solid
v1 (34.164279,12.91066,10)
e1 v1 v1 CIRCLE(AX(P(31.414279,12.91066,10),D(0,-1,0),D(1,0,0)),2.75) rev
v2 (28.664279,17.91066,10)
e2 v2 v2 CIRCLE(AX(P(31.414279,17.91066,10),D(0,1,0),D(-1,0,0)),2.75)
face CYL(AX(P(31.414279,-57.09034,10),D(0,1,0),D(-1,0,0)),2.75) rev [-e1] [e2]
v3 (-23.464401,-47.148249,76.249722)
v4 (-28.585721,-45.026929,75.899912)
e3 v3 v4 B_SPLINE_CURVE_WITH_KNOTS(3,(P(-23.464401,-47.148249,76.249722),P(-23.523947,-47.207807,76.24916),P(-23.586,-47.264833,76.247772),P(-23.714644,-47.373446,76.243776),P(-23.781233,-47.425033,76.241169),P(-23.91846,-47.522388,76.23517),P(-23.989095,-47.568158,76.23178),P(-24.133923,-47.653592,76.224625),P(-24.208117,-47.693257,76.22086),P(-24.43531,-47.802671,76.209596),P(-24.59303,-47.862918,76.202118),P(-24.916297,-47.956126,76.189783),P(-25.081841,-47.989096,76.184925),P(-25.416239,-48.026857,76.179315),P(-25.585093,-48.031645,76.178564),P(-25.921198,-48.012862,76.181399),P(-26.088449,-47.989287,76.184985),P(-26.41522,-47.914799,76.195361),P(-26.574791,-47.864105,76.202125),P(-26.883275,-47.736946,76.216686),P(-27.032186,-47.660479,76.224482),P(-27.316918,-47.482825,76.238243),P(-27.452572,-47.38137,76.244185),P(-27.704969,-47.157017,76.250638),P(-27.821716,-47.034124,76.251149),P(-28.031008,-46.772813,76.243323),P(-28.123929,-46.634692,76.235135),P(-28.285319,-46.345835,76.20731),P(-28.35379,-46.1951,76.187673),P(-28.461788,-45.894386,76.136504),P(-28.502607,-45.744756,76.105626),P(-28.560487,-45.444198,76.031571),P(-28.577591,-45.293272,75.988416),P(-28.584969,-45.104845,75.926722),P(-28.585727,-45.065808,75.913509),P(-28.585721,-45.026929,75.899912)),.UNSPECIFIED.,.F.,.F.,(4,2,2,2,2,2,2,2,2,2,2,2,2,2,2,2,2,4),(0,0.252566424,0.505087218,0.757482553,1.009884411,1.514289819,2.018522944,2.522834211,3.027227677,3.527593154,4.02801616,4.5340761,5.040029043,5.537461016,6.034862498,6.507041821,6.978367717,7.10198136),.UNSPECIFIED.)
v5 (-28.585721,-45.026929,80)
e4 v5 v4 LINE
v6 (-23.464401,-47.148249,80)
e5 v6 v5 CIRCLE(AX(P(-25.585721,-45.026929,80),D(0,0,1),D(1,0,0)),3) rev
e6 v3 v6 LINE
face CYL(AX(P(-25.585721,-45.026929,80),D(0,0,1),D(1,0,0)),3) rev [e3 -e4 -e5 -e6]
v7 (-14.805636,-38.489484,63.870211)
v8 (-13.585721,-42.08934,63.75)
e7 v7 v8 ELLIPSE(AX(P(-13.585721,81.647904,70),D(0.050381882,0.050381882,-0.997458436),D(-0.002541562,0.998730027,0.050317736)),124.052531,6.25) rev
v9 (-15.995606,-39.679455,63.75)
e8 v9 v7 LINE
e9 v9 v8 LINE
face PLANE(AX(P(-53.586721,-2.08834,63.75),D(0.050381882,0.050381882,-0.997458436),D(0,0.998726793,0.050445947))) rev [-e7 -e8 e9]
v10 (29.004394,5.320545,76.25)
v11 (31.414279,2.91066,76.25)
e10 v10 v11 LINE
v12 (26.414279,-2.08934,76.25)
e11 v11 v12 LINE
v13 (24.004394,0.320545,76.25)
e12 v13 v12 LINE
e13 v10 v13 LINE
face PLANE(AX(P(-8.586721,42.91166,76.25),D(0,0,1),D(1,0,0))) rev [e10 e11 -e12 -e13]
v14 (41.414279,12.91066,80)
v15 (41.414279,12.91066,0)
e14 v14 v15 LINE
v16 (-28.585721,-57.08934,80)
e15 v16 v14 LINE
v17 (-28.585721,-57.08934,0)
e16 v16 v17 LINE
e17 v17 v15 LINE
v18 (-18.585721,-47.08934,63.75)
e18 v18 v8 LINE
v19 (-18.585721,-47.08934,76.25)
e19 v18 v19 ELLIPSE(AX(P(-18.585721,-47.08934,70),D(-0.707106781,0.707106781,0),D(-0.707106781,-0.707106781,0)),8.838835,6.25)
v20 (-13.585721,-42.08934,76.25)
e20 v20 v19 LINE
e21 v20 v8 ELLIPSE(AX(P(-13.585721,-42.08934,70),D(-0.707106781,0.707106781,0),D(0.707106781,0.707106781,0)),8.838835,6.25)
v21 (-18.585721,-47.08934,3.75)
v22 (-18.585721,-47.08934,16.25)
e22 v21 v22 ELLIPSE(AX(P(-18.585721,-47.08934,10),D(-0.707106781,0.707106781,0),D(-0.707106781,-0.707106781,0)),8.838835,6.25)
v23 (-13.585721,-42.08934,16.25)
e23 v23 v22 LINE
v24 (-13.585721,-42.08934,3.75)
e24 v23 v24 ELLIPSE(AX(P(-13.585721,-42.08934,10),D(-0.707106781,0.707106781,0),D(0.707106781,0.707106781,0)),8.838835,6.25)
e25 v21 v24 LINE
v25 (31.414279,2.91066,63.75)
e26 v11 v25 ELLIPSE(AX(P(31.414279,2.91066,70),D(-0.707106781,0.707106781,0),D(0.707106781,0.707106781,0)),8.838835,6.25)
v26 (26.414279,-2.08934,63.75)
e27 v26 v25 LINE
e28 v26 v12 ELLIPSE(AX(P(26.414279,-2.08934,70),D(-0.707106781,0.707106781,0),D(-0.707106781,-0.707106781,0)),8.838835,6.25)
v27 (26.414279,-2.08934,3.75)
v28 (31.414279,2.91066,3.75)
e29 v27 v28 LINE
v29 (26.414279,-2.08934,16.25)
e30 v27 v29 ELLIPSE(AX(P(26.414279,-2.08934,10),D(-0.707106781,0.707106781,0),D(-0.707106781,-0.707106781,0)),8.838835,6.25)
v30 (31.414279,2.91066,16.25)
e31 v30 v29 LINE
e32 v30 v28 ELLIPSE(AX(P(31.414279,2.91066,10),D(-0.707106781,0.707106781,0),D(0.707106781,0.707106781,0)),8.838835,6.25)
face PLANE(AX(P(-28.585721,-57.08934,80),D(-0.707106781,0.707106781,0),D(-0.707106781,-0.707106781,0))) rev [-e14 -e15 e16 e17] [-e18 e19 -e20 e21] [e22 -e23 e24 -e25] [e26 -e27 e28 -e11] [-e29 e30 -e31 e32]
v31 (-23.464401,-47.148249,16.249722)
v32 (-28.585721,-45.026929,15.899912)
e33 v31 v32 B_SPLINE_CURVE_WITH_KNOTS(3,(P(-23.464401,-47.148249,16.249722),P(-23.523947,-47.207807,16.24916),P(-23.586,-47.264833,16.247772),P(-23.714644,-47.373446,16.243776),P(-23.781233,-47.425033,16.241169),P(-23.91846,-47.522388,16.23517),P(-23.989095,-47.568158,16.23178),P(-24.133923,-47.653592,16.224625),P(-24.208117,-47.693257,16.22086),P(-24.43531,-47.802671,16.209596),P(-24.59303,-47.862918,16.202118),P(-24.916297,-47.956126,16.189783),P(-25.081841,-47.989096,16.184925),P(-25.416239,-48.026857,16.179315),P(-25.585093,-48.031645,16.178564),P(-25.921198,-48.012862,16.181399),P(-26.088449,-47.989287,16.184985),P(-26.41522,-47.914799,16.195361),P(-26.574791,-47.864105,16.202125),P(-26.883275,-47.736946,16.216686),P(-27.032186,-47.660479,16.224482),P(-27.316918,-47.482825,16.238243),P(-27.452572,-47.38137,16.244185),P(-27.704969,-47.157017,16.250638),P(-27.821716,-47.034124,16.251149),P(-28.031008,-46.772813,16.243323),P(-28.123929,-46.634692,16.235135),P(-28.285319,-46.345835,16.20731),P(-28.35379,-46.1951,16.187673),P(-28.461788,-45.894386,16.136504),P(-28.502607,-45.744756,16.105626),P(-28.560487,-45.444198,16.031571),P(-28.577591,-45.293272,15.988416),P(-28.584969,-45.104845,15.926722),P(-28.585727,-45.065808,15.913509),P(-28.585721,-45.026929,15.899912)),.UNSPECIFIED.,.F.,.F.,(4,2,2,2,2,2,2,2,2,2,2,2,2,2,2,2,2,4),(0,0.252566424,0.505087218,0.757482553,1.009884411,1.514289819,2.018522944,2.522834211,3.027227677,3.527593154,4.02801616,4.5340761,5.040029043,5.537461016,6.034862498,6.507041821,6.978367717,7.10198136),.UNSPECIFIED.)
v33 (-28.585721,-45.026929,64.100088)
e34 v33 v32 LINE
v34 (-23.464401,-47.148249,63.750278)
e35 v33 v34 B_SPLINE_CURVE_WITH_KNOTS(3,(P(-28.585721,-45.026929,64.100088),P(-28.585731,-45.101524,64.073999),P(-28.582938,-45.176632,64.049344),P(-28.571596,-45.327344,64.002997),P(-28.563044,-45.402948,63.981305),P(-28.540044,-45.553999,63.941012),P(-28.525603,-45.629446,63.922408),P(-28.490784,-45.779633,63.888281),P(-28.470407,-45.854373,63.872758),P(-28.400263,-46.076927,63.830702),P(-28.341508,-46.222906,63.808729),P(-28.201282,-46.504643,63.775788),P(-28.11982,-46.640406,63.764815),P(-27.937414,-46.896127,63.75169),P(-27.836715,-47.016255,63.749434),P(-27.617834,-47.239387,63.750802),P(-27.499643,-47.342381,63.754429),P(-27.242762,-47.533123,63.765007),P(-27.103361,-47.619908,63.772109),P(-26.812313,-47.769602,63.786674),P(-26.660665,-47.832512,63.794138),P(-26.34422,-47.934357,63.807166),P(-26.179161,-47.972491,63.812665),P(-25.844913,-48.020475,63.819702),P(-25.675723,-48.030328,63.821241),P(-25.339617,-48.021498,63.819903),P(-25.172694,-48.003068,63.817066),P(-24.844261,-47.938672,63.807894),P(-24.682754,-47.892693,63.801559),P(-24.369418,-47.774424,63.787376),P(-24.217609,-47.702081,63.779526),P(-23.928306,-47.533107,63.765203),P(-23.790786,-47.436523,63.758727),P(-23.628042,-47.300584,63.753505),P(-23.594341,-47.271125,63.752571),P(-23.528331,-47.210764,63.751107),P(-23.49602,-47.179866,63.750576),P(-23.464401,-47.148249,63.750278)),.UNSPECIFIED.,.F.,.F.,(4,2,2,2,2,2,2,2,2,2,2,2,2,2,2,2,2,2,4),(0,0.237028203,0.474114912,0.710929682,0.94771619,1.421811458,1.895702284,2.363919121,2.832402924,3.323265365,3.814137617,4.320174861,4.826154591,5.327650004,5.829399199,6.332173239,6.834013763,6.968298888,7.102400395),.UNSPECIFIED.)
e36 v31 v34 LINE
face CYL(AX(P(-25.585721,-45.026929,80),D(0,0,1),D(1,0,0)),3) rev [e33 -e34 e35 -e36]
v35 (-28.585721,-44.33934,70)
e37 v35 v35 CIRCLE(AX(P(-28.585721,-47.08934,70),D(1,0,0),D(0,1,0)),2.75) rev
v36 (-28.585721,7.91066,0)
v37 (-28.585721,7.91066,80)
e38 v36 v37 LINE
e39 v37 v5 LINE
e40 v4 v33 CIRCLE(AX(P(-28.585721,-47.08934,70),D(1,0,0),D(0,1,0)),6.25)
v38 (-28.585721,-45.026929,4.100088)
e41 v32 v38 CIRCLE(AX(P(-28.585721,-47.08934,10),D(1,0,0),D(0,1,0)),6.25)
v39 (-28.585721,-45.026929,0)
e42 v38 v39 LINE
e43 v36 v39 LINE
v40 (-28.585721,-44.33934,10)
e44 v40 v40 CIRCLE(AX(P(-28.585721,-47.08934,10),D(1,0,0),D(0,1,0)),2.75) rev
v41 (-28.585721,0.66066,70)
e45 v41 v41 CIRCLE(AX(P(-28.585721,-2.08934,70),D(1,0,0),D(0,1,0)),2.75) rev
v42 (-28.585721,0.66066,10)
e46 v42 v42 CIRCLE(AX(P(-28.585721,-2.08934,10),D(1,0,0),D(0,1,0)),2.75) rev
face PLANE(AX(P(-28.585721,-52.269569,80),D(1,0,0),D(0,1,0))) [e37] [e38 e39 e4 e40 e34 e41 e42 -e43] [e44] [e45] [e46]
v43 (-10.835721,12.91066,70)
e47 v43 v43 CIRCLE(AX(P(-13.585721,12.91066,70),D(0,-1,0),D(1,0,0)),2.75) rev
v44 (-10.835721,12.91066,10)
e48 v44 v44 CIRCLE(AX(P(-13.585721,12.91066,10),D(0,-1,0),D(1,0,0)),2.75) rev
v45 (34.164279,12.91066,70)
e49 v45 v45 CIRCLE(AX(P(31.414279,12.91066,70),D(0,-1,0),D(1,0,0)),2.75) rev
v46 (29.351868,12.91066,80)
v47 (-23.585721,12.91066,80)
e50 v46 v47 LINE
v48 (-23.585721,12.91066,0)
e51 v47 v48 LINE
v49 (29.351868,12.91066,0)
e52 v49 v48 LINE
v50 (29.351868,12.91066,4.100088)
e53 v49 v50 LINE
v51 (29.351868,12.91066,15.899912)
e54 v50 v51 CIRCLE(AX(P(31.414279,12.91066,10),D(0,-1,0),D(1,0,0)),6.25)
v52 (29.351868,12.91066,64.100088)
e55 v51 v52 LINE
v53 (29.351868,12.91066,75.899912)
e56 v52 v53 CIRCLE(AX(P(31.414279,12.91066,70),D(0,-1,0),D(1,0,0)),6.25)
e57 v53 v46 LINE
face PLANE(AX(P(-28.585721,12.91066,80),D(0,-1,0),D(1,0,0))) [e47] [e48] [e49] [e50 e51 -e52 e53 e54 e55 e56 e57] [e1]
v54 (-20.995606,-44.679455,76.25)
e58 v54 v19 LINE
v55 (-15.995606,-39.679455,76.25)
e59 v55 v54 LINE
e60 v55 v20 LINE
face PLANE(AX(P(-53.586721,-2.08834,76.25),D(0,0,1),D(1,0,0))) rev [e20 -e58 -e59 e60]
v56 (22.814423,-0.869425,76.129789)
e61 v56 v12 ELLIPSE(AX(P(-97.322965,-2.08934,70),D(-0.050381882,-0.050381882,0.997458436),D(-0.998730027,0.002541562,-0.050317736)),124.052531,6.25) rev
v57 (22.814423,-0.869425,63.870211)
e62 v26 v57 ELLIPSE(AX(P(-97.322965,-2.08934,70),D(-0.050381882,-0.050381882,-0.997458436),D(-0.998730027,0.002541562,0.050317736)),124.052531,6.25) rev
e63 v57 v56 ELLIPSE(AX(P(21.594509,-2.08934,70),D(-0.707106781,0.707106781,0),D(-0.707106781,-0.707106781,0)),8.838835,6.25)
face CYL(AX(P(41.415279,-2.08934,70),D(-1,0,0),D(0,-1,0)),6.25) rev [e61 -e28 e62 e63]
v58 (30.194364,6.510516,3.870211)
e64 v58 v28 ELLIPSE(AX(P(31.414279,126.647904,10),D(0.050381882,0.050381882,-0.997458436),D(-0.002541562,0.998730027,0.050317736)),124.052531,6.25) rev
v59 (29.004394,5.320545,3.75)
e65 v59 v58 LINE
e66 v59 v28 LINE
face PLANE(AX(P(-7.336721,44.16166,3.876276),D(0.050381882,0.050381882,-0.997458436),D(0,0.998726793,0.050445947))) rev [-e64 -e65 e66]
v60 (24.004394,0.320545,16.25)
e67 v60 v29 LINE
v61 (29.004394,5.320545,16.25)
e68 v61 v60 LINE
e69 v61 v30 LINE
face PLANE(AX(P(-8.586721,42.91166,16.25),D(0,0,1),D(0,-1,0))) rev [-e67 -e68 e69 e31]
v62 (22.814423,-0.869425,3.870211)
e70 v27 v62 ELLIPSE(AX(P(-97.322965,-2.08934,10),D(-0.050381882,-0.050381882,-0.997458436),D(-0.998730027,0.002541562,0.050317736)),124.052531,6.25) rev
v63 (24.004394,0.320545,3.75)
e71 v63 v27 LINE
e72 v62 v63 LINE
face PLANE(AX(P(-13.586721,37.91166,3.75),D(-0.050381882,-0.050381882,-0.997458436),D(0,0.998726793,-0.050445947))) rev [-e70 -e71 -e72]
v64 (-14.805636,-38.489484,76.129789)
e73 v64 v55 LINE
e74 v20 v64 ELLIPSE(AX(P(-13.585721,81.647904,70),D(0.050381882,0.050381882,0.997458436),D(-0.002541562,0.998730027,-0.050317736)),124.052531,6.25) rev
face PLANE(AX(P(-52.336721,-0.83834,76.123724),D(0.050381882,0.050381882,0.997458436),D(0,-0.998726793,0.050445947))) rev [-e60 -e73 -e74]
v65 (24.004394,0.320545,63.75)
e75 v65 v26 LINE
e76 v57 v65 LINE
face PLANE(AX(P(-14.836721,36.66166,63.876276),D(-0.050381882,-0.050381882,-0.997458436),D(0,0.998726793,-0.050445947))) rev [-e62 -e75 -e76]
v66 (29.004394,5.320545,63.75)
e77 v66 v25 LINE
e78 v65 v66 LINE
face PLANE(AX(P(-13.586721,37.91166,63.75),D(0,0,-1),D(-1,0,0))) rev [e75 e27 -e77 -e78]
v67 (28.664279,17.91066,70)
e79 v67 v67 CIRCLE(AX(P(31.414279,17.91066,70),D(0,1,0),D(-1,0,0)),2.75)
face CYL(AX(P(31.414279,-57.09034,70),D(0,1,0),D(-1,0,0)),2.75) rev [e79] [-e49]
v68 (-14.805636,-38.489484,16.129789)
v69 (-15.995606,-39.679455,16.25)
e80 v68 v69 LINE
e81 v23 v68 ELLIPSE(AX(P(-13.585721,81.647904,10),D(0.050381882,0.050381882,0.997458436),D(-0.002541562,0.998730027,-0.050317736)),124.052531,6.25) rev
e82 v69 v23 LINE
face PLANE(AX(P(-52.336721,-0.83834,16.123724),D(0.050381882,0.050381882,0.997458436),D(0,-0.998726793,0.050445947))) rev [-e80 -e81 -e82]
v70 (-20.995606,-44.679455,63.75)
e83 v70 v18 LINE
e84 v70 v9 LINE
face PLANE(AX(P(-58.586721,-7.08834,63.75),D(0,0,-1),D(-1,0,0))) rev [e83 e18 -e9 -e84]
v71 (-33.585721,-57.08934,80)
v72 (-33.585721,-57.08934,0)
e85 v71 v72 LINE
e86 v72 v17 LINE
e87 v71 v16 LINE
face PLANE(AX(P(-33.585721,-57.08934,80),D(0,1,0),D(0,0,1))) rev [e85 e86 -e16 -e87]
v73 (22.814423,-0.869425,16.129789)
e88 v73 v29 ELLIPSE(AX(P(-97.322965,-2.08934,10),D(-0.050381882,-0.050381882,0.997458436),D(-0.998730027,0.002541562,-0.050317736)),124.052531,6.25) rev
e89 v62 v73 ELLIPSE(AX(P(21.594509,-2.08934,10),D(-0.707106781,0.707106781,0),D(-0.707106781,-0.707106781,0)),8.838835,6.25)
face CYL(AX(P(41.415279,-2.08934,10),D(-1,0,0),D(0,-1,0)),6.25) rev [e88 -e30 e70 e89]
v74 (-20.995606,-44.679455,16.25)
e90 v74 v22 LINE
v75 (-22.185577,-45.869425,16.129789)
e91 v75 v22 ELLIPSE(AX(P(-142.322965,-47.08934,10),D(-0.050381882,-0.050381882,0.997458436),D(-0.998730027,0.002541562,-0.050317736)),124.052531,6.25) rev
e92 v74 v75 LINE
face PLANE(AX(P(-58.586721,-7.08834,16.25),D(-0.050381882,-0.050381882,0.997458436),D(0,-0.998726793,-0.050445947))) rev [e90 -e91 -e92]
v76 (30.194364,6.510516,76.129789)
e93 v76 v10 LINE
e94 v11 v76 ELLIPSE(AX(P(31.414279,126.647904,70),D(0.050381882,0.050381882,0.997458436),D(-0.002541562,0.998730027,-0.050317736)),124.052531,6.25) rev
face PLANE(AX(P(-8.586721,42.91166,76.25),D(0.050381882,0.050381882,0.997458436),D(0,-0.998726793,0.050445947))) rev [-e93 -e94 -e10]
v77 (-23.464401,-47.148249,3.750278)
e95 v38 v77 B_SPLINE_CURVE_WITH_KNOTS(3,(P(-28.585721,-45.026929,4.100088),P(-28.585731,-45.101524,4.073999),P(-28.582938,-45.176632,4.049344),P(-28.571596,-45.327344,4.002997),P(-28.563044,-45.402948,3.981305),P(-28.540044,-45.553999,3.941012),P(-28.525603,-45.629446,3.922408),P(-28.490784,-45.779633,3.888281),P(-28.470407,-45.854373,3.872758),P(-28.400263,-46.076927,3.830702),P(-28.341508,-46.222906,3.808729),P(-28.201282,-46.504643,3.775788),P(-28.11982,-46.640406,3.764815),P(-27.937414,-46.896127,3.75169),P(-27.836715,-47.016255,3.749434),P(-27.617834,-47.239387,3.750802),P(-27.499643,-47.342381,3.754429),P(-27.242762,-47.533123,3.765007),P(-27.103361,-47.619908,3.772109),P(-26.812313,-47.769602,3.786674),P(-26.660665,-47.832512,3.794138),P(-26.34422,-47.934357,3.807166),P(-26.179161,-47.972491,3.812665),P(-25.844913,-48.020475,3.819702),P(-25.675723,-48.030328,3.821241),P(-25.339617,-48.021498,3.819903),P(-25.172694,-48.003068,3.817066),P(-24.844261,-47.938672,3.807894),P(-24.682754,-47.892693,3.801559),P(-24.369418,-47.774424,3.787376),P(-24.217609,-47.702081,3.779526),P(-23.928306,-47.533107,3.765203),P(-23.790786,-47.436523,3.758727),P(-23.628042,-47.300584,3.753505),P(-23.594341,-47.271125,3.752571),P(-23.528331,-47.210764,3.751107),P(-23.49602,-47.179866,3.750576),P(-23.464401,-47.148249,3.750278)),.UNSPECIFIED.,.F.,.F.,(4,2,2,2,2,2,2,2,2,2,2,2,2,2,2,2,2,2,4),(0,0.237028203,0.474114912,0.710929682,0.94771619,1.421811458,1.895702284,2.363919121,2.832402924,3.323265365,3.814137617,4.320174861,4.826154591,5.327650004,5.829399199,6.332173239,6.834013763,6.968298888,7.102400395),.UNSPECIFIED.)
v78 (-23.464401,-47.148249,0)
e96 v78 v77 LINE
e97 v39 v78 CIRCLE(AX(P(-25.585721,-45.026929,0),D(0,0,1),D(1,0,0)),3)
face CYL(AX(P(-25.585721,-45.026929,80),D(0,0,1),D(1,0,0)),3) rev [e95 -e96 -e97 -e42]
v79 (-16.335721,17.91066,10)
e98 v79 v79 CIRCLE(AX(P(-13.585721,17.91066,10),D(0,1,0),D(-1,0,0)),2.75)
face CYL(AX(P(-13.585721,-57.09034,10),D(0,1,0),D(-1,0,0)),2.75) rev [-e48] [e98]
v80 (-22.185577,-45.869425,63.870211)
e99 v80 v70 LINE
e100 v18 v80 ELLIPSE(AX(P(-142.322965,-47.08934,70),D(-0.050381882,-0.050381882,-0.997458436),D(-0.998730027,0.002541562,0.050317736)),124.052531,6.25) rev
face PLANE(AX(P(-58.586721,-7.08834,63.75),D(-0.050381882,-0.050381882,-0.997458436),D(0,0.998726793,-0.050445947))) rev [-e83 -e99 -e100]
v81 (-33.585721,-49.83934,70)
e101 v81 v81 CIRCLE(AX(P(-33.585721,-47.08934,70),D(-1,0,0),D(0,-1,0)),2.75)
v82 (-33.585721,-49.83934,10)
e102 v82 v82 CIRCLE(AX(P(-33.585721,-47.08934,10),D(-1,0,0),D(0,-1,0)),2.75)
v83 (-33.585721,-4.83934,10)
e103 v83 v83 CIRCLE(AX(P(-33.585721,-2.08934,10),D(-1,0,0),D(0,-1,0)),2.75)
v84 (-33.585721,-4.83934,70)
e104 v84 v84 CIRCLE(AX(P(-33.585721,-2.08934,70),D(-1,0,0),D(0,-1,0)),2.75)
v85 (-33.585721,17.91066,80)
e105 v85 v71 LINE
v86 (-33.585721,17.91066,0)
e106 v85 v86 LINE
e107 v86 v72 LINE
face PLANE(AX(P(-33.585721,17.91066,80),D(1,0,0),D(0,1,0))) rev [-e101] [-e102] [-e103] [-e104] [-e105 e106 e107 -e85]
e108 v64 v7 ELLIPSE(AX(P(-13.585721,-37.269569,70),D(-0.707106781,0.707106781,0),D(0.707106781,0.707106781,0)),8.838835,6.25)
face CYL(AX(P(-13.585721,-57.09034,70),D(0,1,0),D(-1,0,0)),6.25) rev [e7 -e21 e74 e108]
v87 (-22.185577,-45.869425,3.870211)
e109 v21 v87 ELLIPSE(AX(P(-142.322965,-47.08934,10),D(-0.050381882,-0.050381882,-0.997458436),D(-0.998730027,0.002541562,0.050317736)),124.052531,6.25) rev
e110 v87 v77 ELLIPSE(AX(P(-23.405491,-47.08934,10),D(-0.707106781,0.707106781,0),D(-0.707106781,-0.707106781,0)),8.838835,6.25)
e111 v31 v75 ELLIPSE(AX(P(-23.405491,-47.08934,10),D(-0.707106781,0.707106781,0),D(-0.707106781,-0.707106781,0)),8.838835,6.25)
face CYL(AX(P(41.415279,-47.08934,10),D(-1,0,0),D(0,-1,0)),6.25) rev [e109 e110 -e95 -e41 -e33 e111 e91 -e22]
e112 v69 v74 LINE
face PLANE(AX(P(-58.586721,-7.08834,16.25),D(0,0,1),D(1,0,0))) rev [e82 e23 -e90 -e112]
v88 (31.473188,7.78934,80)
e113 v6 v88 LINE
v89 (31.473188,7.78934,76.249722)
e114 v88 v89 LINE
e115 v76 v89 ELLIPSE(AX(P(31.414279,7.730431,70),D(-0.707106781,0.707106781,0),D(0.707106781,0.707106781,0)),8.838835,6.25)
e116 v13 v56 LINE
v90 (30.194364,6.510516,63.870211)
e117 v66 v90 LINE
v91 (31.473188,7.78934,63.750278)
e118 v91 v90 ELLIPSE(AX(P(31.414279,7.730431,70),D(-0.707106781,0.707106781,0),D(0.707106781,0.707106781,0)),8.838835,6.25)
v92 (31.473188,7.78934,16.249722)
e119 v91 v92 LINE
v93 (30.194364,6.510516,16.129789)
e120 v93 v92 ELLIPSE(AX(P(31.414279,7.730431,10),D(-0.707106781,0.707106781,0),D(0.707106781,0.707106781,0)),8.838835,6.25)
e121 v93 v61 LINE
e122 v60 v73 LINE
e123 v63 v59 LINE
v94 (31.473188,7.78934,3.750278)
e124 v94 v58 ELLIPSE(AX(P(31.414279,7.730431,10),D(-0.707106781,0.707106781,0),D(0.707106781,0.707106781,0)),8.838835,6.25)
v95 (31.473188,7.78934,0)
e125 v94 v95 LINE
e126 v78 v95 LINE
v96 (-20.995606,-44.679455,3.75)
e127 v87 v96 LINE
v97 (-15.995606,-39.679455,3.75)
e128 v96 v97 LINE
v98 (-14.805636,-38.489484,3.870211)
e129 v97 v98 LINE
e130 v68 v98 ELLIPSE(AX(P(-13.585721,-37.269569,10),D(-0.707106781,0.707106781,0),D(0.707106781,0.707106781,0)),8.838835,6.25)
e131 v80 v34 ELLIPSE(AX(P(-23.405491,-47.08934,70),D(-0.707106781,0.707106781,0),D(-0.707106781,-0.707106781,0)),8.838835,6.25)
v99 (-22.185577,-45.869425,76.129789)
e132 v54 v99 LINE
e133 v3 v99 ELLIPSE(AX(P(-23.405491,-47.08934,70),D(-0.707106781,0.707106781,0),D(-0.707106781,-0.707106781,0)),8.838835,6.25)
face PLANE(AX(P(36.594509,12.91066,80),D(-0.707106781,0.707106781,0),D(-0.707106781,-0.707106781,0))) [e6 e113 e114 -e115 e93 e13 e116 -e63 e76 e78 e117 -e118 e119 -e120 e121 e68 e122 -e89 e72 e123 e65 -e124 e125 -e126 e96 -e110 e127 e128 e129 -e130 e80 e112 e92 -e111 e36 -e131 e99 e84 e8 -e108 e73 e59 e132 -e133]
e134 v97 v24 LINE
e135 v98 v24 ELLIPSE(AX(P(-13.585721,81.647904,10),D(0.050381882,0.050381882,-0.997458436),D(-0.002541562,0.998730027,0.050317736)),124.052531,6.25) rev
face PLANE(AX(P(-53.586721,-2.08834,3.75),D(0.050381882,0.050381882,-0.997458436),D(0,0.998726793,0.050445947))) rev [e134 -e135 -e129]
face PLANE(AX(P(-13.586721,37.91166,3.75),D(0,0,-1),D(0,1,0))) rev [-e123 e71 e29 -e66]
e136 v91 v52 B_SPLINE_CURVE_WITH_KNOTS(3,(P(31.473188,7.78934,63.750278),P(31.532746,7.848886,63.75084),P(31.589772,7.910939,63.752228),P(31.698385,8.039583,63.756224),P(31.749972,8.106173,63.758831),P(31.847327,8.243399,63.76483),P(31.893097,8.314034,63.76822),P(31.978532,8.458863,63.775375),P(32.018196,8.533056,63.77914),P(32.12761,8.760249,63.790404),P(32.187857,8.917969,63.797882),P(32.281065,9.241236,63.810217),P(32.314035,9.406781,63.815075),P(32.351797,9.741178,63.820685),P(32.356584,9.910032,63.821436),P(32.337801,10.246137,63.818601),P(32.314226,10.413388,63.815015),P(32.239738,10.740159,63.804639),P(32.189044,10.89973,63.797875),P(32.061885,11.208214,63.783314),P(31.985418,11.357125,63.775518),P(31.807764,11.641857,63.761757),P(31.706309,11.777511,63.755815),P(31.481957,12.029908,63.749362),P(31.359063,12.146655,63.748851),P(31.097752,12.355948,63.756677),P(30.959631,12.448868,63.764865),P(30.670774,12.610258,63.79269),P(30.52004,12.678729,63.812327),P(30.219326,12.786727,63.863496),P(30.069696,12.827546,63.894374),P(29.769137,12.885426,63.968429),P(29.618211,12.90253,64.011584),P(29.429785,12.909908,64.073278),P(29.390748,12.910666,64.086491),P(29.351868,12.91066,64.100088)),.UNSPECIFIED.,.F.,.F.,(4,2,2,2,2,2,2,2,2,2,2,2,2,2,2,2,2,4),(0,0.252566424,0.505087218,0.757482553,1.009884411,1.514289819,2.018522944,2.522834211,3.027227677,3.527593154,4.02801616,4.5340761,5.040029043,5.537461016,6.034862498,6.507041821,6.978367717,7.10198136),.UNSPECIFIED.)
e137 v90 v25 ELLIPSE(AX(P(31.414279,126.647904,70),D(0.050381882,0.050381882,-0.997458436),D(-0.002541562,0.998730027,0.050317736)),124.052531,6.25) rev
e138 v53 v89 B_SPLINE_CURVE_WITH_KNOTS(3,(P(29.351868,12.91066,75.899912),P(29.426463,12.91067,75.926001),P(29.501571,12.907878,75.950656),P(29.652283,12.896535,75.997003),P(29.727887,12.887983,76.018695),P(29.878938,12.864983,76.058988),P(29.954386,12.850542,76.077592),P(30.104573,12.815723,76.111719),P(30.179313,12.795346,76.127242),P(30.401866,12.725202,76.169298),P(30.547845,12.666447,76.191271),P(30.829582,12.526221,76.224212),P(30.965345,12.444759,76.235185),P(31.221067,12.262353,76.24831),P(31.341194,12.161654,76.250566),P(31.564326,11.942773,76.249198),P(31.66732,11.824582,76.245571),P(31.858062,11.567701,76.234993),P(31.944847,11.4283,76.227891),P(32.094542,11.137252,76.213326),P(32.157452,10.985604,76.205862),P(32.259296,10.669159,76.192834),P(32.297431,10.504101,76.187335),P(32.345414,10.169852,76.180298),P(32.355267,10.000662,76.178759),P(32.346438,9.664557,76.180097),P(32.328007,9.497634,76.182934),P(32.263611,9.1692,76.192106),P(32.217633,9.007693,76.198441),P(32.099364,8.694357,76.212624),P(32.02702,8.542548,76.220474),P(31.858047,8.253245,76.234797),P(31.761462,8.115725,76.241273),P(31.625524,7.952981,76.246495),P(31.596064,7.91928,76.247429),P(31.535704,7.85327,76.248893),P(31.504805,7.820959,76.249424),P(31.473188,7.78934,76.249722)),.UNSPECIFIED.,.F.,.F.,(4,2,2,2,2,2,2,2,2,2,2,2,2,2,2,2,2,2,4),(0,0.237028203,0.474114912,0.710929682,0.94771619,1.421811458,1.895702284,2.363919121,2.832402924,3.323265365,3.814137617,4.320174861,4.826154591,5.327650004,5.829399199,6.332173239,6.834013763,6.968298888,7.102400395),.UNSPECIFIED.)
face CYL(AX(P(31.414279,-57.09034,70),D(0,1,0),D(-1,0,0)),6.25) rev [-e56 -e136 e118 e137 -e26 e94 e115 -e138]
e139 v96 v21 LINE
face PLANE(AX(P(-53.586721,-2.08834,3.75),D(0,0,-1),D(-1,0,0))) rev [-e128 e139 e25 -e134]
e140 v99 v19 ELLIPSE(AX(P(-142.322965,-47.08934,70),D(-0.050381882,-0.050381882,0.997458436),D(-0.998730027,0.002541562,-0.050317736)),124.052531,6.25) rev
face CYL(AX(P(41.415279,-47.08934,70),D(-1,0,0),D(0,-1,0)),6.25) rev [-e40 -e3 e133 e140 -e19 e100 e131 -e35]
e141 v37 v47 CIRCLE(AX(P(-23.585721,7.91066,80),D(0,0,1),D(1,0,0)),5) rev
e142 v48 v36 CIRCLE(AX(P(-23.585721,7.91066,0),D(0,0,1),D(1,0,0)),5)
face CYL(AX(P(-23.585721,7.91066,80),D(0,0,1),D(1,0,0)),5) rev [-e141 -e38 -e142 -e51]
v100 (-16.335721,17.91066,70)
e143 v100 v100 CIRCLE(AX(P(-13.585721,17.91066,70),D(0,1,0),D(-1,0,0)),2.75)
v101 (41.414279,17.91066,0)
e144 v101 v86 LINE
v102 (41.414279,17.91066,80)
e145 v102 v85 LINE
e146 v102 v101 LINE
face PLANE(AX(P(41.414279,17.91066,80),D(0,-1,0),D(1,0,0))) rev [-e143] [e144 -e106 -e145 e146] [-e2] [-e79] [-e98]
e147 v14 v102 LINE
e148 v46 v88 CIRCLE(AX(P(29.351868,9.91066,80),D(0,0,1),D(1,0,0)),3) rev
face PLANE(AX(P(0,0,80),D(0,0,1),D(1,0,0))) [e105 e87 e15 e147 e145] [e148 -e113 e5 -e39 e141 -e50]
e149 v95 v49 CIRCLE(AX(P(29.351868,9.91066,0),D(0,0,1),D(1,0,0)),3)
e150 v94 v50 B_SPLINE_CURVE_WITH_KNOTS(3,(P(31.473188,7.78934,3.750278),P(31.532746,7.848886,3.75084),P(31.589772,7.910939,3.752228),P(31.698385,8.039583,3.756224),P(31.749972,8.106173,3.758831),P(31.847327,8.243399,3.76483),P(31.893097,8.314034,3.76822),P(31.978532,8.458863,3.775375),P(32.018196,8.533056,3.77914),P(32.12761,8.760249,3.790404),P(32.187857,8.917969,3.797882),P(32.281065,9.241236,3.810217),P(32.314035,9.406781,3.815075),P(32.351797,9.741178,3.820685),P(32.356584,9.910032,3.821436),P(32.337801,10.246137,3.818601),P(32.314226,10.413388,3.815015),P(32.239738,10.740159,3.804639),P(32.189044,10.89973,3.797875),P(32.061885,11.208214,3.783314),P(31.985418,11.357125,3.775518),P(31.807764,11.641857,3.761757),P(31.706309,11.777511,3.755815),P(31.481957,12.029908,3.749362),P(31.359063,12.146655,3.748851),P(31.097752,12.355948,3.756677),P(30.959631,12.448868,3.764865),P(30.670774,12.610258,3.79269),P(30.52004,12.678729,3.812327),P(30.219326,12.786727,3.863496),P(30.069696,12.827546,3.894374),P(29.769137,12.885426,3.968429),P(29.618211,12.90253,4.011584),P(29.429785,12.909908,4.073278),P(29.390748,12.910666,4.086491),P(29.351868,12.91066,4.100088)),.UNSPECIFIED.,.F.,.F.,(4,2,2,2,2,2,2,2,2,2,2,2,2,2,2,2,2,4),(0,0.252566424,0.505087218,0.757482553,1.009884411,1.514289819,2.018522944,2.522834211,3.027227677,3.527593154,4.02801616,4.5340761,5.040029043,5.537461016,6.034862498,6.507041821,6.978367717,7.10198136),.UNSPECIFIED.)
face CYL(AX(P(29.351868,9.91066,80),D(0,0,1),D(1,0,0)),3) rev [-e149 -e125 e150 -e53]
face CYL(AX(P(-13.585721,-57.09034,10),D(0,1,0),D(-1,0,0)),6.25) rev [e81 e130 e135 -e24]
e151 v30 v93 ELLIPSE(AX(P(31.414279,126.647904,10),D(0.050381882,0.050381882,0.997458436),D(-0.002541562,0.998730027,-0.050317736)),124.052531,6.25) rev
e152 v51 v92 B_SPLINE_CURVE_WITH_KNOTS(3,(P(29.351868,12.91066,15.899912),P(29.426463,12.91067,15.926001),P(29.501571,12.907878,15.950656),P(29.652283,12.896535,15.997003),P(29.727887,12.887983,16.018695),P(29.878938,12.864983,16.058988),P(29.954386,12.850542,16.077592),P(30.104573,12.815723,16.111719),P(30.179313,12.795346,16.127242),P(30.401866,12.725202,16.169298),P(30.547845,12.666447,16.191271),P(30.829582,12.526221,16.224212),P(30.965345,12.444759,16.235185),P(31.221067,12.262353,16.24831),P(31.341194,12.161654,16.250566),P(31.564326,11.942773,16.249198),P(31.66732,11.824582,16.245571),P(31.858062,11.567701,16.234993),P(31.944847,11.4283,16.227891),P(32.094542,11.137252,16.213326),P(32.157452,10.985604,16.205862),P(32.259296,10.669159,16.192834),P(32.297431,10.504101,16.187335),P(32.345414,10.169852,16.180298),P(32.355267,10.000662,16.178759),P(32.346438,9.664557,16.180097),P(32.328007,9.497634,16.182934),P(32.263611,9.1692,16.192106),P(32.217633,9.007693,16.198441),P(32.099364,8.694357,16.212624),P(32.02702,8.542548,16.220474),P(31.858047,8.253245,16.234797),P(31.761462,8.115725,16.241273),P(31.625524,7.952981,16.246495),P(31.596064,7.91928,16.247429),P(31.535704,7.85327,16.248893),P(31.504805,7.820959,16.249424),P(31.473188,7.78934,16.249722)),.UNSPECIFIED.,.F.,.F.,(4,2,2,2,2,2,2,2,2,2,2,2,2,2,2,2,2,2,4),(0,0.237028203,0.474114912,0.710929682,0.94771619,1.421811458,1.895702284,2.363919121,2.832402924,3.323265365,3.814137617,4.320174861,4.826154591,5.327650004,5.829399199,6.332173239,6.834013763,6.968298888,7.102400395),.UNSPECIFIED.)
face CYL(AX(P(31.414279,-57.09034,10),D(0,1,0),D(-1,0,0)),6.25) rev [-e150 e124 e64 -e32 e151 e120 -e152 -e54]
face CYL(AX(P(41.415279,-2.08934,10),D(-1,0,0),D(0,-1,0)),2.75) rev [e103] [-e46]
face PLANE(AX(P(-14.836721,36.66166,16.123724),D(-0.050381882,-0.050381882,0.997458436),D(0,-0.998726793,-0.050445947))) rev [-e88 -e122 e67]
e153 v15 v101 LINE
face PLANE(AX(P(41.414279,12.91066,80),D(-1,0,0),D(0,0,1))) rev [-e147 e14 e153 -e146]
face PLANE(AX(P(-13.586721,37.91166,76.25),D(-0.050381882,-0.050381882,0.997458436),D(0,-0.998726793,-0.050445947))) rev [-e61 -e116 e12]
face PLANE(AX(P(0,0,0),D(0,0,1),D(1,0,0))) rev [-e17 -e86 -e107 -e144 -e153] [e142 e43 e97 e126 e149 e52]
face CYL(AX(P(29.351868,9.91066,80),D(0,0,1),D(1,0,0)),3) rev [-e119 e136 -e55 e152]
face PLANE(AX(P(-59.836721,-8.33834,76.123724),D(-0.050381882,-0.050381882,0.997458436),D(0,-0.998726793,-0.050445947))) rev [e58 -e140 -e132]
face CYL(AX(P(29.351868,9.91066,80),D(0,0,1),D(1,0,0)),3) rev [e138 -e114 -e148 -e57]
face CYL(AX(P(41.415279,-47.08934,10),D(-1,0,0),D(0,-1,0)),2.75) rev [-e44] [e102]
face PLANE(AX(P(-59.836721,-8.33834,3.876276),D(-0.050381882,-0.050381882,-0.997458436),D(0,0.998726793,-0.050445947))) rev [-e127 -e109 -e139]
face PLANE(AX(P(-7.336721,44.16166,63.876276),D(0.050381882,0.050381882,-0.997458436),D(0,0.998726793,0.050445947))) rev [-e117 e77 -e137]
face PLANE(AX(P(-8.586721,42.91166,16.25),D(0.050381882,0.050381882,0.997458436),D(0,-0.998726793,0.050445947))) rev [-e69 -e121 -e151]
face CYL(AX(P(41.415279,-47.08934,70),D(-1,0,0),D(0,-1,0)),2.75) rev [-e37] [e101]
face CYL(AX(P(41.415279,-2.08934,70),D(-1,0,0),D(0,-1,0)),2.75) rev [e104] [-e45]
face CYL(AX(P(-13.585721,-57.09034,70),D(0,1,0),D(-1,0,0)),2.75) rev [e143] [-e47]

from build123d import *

# Parameters (mm, degrees)
BOSS_EXTRU_1_DEPTH      = 80
CONG_1_R                = 3
CONG_2_R                = 5
ENL_V_MAT_EXTRU_1_REACH = 119.218
ESQUISSE2_R             = 2.75
ENL_V_MAT_EXTRU_2_REACH = 116.084
ESQUISSE3_R             = 6.25
ENL_V_MAT_EXTRU_3_REACH = 125.629
ESQUISSE4_R             = 2.75
ENL_V_MAT_EXTRU_4_REACH = 122.661
ESQUISSE5_R             = 6.25
ENL_V_START             = -3.408092413
ENL_V_MAT_EXTRU_5_DEPTH = 3.408092413


# Read off the part's stored shape, not the designer's step: Enlèv. mat.-Extru.5
with BuildPart() as part:
    # Esquisse1 → Boss.-Extru.1 (new body)
    with BuildSketch(Plane.XY):
        Polygon((-33.585720943, 17.910660079), (-33.585720943, -57.089339921), (-28.585720943, -57.089339921), (41.414279057, 12.910660079), (41.414279057, 17.910660079), align=None)
        Polygon((-28.585720943, -52.269569409), (-28.585720943, 12.910660079), (36.594508545, 12.910660079), align=None, mode=Mode.SUBTRACT)
    extrude(amount=BOSS_EXTRU_1_DEPTH)

    # Congé1
    cong_1_edges = [part.edges().sort_by_distance(p)[0] for p in [
        (-28.585720943, -52.269569409, 40),
        (36.594508545, 12.910660079, 40),
    ]]
    fillet(cong_1_edges, radius=CONG_1_R)

    # Congé2
    cong_2_edges = [part.edges().sort_by_distance(p)[0] for p in [
        (-28.585720943, 12.910660079, 40),
    ]]
    fillet(cong_2_edges, radius=CONG_2_R)

    # Esquisse2 → Enlèv. mat.-Extru.1 (cut, up to next)
    with BuildSketch(Plane(origin=(0, 17.910660079, 0), x_dir=(1, 0, 0), z_dir=(0, 1, 0)), mode=Mode.PRIVATE) as enl_v_mat_extru_1_sk1:
        with Locations(Location((-13.585720943, -10, 0), (0, 0, 180))):
            Circle(ESQUISSE2_R)
    enl_v_mat_extru_1_tool1 = extrude(enl_v_mat_extru_1_sk1.sketch, amount=-ENL_V_MAT_EXTRU_1_REACH, mode=Mode.PRIVATE) & part.part
    # Esquisse2 → Enlèv. mat.-Extru.1 (cut, up to next)
    with BuildSketch(Plane(origin=(0, 17.910660079, 0), x_dir=(1, 0, 0), z_dir=(0, 1, 0)), mode=Mode.PRIVATE) as enl_v_mat_extru_1_sk2:
        with Locations(Location((31.414279057, -10, 0), (0, 0, 180))):
            Circle(ESQUISSE2_R)
    enl_v_mat_extru_1_tool2 = extrude(enl_v_mat_extru_1_sk2.sketch, amount=-ENL_V_MAT_EXTRU_1_REACH, mode=Mode.PRIVATE) & part.part
    # Esquisse2 → Enlèv. mat.-Extru.1 (cut, up to next)
    with BuildSketch(Plane(origin=(0, 17.910660079, 0), x_dir=(1, 0, 0), z_dir=(0, 1, 0)), mode=Mode.PRIVATE) as enl_v_mat_extru_1_sk3:
        with Locations(Location((31.414279057, -70, 0), (0, 0, 180))):
            Circle(ESQUISSE2_R)
    enl_v_mat_extru_1_tool3 = extrude(enl_v_mat_extru_1_sk3.sketch, amount=-ENL_V_MAT_EXTRU_1_REACH, mode=Mode.PRIVATE) & part.part
    # Esquisse2 → Enlèv. mat.-Extru.1 (cut, up to next)
    with BuildSketch(Plane(origin=(0, 17.910660079, 0), x_dir=(1, 0, 0), z_dir=(0, 1, 0)), mode=Mode.PRIVATE) as enl_v_mat_extru_1_sk4:
        with Locations(Location((-13.585720943, -70, 0), (0, 0, 180))):
            Circle(ESQUISSE2_R)
    enl_v_mat_extru_1_tool4 = extrude(enl_v_mat_extru_1_sk4.sketch, amount=-ENL_V_MAT_EXTRU_1_REACH, mode=Mode.PRIVATE) & part.part
    add(enl_v_mat_extru_1_tool1.solids().sort_by_distance((-13.585721, 17.91066, 10))[0], mode=Mode.SUBTRACT)
    add(enl_v_mat_extru_1_tool2.solids().sort_by_distance((31.414279, 17.91066, 10))[0], mode=Mode.SUBTRACT)
    add(enl_v_mat_extru_1_tool3.solids().sort_by_distance((31.414279, 17.91066, 70))[0], mode=Mode.SUBTRACT)
    add(enl_v_mat_extru_1_tool4.solids().sort_by_distance((-13.585721, 17.91066, 70))[0], mode=Mode.SUBTRACT)

    # Enlèv. mat.-Extru.2: up to this plane
    enl_v_mat_extru_2_end = Plane(origin=(-28.585720943, -57.089339921, 80), z_dir=(-0.7071067811865477, 0.7071067811865474, 0))
    # Esquisse3 → Enlèv. mat.-Extru.2 (cut, up to the surface)
    with BuildSketch(Plane.XZ.offset(-12.910660079), mode=Mode.PRIVATE) as enl_v_mat_extru_2_sk1:
        with Locations((-13.585720943, 10)):
            Circle(ESQUISSE3_R)
    enl_v_mat_extru_2_tool1 = split(extrude(enl_v_mat_extru_2_sk1.sketch, amount=ENL_V_MAT_EXTRU_2_REACH, mode=Mode.PRIVATE), bisect_by=enl_v_mat_extru_2_end, keep=Keep.BOTH, mode=Mode.PRIVATE)
    add(enl_v_mat_extru_2_tool1.solids().sort_by_distance((-13.585721, 12.91066, 10))[0], mode=Mode.SUBTRACT)
    # Esquisse3 → Enlèv. mat.-Extru.2 (cut, up to the surface)
    with BuildSketch(Plane.XZ.offset(-12.910660079), mode=Mode.PRIVATE) as enl_v_mat_extru_2_sk2:
        with Locations((-13.585720943, 70)):
            Circle(ESQUISSE3_R)
    enl_v_mat_extru_2_tool2 = split(extrude(enl_v_mat_extru_2_sk2.sketch, amount=ENL_V_MAT_EXTRU_2_REACH, mode=Mode.PRIVATE), bisect_by=enl_v_mat_extru_2_end, keep=Keep.BOTH, mode=Mode.PRIVATE)
    add(enl_v_mat_extru_2_tool2.solids().sort_by_distance((-13.585721, 12.91066, 70))[0], mode=Mode.SUBTRACT)
    # Esquisse3 → Enlèv. mat.-Extru.2 (cut, up to the surface)
    with BuildSketch(Plane.XZ.offset(-12.910660079), mode=Mode.PRIVATE) as enl_v_mat_extru_2_sk3:
        with Locations(Location((31.414279057, 10, 0), (0, 0, 109.267913115))):
            Circle(ESQUISSE3_R)
    enl_v_mat_extru_2_tool3 = split(extrude(enl_v_mat_extru_2_sk3.sketch, amount=ENL_V_MAT_EXTRU_2_REACH, mode=Mode.PRIVATE), bisect_by=enl_v_mat_extru_2_end, keep=Keep.BOTH, mode=Mode.PRIVATE)
    add(enl_v_mat_extru_2_tool3.solids().sort_by_distance((31.414279, 12.91066, 10))[0], mode=Mode.SUBTRACT)
    # Esquisse3 → Enlèv. mat.-Extru.2 (cut, up to the surface)
    with BuildSketch(Plane.XZ.offset(-12.910660079), mode=Mode.PRIVATE) as enl_v_mat_extru_2_sk4:
        with Locations(Location((31.414279057, 70, 0), (0, 0, 109.267913115))):
            Circle(ESQUISSE3_R)
    enl_v_mat_extru_2_tool4 = split(extrude(enl_v_mat_extru_2_sk4.sketch, amount=ENL_V_MAT_EXTRU_2_REACH, mode=Mode.PRIVATE), bisect_by=enl_v_mat_extru_2_end, keep=Keep.BOTH, mode=Mode.PRIVATE)
    add(enl_v_mat_extru_2_tool4.solids().sort_by_distance((31.414279, 12.91066, 70))[0], mode=Mode.SUBTRACT)

    # Esquisse4 → Enlèv. mat.-Extru.3 (cut, up to next)
    with BuildSketch(Plane.ZY.offset(33.585720943), mode=Mode.PRIVATE) as enl_v_mat_extru_3_sk1:
        with Locations(Location((10, -47.089339921, 0), (0, 0, 270))):
            Circle(ESQUISSE4_R)
    enl_v_mat_extru_3_tool1 = extrude(enl_v_mat_extru_3_sk1.sketch, amount=-ENL_V_MAT_EXTRU_3_REACH, mode=Mode.PRIVATE) & part.part
    # Esquisse4 → Enlèv. mat.-Extru.3 (cut, up to next)
    with BuildSketch(Plane.ZY.offset(33.585720943), mode=Mode.PRIVATE) as enl_v_mat_extru_3_sk2:
        with Locations(Location((10, -2.089339921, 0), (0, 0, 270))):
            Circle(ESQUISSE4_R)
    enl_v_mat_extru_3_tool2 = extrude(enl_v_mat_extru_3_sk2.sketch, amount=-ENL_V_MAT_EXTRU_3_REACH, mode=Mode.PRIVATE) & part.part
    # Esquisse4 → Enlèv. mat.-Extru.3 (cut, up to next)
    with BuildSketch(Plane.ZY.offset(33.585720943), mode=Mode.PRIVATE) as enl_v_mat_extru_3_sk3:
        with Locations(Location((70, -2.089339921, 0), (0, 0, 270))):
            Circle(ESQUISSE4_R)
    enl_v_mat_extru_3_tool3 = extrude(enl_v_mat_extru_3_sk3.sketch, amount=-ENL_V_MAT_EXTRU_3_REACH, mode=Mode.PRIVATE) & part.part
    # Esquisse4 → Enlèv. mat.-Extru.3 (cut, up to next)
    with BuildSketch(Plane.ZY.offset(33.585720943), mode=Mode.PRIVATE) as enl_v_mat_extru_3_sk4:
        with Locations(Location((70, -47.089339921, 0), (0, 0, 270))):
            Circle(ESQUISSE4_R)
    enl_v_mat_extru_3_tool4 = extrude(enl_v_mat_extru_3_sk4.sketch, amount=-ENL_V_MAT_EXTRU_3_REACH, mode=Mode.PRIVATE) & part.part
    add(enl_v_mat_extru_3_tool1.solids().sort_by_distance((-33.585721, -47.08934, 10))[0], mode=Mode.SUBTRACT)
    add(enl_v_mat_extru_3_tool2.solids().sort_by_distance((-33.585721, -2.08934, 10))[0], mode=Mode.SUBTRACT)
    add(enl_v_mat_extru_3_tool3.solids().sort_by_distance((-33.585721, -2.08934, 70))[0], mode=Mode.SUBTRACT)
    add(enl_v_mat_extru_3_tool4.solids().sort_by_distance((-33.585721, -47.08934, 70))[0], mode=Mode.SUBTRACT)

    # Esquisse5 → Enlèv. mat.-Extru.4 (cut, up to next)
    with BuildSketch(Plane(origin=(-28.585720943, 0, 0), x_dir=(0, 0, -1), z_dir=(1, 0, 0)), mode=Mode.PRIVATE) as enl_v_mat_extru_4_sk1:
        with Locations((-10, -2.089339921)):
            Circle(ESQUISSE5_R)
    enl_v_mat_extru_4_tool1 = extrude(enl_v_mat_extru_4_sk1.sketch, amount=ENL_V_MAT_EXTRU_4_REACH, mode=Mode.PRIVATE) & part.part
    # Esquisse5 → Enlèv. mat.-Extru.4 (cut, up to next)
    with BuildSketch(Plane(origin=(-28.585720943, 0, 0), x_dir=(0, 0, -1), z_dir=(1, 0, 0)), mode=Mode.PRIVATE) as enl_v_mat_extru_4_sk2:
        with Locations((-70, -2.089339921)):
            Circle(ESQUISSE5_R)
    enl_v_mat_extru_4_tool2 = extrude(enl_v_mat_extru_4_sk2.sketch, amount=ENL_V_MAT_EXTRU_4_REACH, mode=Mode.PRIVATE) & part.part
    # Esquisse5 → Enlèv. mat.-Extru.4 (cut, up to next)
    with BuildSketch(Plane(origin=(-28.585720943, 0, 0), x_dir=(0, 0, -1), z_dir=(1, 0, 0)), mode=Mode.PRIVATE) as enl_v_mat_extru_4_sk3:
        with Locations((-10, -47.089339921)):
            Circle(ESQUISSE5_R)
    enl_v_mat_extru_4_tool3 = extrude(enl_v_mat_extru_4_sk3.sketch, amount=ENL_V_MAT_EXTRU_4_REACH, mode=Mode.PRIVATE) & part.part
    # Esquisse5 → Enlèv. mat.-Extru.4 (cut, up to next)
    with BuildSketch(Plane(origin=(-28.585720943, 0, 0), x_dir=(0, 0, -1), z_dir=(1, 0, 0)), mode=Mode.PRIVATE) as enl_v_mat_extru_4_sk4:
        with Locations((-70, -47.089339921)):
            Circle(ESQUISSE5_R)
    enl_v_mat_extru_4_tool4 = extrude(enl_v_mat_extru_4_sk4.sketch, amount=ENL_V_MAT_EXTRU_4_REACH, mode=Mode.PRIVATE) & part.part
    add(enl_v_mat_extru_4_tool1.solids().sort_by_distance((-28.585721, -2.08934, 10))[0], mode=Mode.SUBTRACT)
    add(enl_v_mat_extru_4_tool2.solids().sort_by_distance((-28.585721, -2.08934, 70))[0], mode=Mode.SUBTRACT)
    add(enl_v_mat_extru_4_tool3.solids().sort_by_distance((-28.585721, -47.08934, 10))[0], mode=Mode.SUBTRACT)
    add(enl_v_mat_extru_4_tool4.solids().sort_by_distance((-28.585721, -47.08934, 70))[0], mode=Mode.SUBTRACT)

    # Enlèv. mat.-Extru.5 outline → Enlèv. mat.-Extru.5 (cut)
    with BuildSketch(Plane(origin=(14.251809489, -14.251809489, 0), x_dir=(0, 0, -1), z_dir=(0.7071067811865477, -0.7071067811865474, 0)).offset(ENL_V_START)):
        Polygon((-3.876275643, 15.432562462), (-3.75, 17.200329415), (-3.75, 24.271397227), (-3.876275643, 26.03916418), (-16.123724357, 26.03916418), (-16.25, 24.271397227), (-16.25, 17.200329415), (-16.123724357, 15.432562462), align=None)
        Polygon((-3.75, -46.439280892), (-3.75, -39.36821308), (-3.876275643, -37.600446127), (-16.123724357, -37.600446127), (-16.25, -39.36821308), (-16.25, -46.439280892), (-16.123724357, -48.207047845), (-3.876275643, -48.207047845), align=None)
        Polygon((-76.123724357, -37.600446127), (-76.25, -39.36821308), (-76.25, -46.439280892), (-76.123724357, -48.207047845), (-63.876275643, -48.207047845), (-63.75, -46.439280892), (-63.75, -39.36821308), (-63.876275643, -37.600446127), align=None)
        Polygon((-63.876275643, 15.432562462), (-63.75, 17.200329415), (-63.75, 24.271397227), (-63.876275643, 26.03916418), (-76.123724357, 26.03916418), (-76.25, 24.271397227), (-76.25, 17.200329415), (-76.123724357, 15.432562462), align=None)
    extrude(amount=ENL_V_MAT_EXTRU_5_DEPTH, mode=Mode.SUBTRACT)


solid = part.part
